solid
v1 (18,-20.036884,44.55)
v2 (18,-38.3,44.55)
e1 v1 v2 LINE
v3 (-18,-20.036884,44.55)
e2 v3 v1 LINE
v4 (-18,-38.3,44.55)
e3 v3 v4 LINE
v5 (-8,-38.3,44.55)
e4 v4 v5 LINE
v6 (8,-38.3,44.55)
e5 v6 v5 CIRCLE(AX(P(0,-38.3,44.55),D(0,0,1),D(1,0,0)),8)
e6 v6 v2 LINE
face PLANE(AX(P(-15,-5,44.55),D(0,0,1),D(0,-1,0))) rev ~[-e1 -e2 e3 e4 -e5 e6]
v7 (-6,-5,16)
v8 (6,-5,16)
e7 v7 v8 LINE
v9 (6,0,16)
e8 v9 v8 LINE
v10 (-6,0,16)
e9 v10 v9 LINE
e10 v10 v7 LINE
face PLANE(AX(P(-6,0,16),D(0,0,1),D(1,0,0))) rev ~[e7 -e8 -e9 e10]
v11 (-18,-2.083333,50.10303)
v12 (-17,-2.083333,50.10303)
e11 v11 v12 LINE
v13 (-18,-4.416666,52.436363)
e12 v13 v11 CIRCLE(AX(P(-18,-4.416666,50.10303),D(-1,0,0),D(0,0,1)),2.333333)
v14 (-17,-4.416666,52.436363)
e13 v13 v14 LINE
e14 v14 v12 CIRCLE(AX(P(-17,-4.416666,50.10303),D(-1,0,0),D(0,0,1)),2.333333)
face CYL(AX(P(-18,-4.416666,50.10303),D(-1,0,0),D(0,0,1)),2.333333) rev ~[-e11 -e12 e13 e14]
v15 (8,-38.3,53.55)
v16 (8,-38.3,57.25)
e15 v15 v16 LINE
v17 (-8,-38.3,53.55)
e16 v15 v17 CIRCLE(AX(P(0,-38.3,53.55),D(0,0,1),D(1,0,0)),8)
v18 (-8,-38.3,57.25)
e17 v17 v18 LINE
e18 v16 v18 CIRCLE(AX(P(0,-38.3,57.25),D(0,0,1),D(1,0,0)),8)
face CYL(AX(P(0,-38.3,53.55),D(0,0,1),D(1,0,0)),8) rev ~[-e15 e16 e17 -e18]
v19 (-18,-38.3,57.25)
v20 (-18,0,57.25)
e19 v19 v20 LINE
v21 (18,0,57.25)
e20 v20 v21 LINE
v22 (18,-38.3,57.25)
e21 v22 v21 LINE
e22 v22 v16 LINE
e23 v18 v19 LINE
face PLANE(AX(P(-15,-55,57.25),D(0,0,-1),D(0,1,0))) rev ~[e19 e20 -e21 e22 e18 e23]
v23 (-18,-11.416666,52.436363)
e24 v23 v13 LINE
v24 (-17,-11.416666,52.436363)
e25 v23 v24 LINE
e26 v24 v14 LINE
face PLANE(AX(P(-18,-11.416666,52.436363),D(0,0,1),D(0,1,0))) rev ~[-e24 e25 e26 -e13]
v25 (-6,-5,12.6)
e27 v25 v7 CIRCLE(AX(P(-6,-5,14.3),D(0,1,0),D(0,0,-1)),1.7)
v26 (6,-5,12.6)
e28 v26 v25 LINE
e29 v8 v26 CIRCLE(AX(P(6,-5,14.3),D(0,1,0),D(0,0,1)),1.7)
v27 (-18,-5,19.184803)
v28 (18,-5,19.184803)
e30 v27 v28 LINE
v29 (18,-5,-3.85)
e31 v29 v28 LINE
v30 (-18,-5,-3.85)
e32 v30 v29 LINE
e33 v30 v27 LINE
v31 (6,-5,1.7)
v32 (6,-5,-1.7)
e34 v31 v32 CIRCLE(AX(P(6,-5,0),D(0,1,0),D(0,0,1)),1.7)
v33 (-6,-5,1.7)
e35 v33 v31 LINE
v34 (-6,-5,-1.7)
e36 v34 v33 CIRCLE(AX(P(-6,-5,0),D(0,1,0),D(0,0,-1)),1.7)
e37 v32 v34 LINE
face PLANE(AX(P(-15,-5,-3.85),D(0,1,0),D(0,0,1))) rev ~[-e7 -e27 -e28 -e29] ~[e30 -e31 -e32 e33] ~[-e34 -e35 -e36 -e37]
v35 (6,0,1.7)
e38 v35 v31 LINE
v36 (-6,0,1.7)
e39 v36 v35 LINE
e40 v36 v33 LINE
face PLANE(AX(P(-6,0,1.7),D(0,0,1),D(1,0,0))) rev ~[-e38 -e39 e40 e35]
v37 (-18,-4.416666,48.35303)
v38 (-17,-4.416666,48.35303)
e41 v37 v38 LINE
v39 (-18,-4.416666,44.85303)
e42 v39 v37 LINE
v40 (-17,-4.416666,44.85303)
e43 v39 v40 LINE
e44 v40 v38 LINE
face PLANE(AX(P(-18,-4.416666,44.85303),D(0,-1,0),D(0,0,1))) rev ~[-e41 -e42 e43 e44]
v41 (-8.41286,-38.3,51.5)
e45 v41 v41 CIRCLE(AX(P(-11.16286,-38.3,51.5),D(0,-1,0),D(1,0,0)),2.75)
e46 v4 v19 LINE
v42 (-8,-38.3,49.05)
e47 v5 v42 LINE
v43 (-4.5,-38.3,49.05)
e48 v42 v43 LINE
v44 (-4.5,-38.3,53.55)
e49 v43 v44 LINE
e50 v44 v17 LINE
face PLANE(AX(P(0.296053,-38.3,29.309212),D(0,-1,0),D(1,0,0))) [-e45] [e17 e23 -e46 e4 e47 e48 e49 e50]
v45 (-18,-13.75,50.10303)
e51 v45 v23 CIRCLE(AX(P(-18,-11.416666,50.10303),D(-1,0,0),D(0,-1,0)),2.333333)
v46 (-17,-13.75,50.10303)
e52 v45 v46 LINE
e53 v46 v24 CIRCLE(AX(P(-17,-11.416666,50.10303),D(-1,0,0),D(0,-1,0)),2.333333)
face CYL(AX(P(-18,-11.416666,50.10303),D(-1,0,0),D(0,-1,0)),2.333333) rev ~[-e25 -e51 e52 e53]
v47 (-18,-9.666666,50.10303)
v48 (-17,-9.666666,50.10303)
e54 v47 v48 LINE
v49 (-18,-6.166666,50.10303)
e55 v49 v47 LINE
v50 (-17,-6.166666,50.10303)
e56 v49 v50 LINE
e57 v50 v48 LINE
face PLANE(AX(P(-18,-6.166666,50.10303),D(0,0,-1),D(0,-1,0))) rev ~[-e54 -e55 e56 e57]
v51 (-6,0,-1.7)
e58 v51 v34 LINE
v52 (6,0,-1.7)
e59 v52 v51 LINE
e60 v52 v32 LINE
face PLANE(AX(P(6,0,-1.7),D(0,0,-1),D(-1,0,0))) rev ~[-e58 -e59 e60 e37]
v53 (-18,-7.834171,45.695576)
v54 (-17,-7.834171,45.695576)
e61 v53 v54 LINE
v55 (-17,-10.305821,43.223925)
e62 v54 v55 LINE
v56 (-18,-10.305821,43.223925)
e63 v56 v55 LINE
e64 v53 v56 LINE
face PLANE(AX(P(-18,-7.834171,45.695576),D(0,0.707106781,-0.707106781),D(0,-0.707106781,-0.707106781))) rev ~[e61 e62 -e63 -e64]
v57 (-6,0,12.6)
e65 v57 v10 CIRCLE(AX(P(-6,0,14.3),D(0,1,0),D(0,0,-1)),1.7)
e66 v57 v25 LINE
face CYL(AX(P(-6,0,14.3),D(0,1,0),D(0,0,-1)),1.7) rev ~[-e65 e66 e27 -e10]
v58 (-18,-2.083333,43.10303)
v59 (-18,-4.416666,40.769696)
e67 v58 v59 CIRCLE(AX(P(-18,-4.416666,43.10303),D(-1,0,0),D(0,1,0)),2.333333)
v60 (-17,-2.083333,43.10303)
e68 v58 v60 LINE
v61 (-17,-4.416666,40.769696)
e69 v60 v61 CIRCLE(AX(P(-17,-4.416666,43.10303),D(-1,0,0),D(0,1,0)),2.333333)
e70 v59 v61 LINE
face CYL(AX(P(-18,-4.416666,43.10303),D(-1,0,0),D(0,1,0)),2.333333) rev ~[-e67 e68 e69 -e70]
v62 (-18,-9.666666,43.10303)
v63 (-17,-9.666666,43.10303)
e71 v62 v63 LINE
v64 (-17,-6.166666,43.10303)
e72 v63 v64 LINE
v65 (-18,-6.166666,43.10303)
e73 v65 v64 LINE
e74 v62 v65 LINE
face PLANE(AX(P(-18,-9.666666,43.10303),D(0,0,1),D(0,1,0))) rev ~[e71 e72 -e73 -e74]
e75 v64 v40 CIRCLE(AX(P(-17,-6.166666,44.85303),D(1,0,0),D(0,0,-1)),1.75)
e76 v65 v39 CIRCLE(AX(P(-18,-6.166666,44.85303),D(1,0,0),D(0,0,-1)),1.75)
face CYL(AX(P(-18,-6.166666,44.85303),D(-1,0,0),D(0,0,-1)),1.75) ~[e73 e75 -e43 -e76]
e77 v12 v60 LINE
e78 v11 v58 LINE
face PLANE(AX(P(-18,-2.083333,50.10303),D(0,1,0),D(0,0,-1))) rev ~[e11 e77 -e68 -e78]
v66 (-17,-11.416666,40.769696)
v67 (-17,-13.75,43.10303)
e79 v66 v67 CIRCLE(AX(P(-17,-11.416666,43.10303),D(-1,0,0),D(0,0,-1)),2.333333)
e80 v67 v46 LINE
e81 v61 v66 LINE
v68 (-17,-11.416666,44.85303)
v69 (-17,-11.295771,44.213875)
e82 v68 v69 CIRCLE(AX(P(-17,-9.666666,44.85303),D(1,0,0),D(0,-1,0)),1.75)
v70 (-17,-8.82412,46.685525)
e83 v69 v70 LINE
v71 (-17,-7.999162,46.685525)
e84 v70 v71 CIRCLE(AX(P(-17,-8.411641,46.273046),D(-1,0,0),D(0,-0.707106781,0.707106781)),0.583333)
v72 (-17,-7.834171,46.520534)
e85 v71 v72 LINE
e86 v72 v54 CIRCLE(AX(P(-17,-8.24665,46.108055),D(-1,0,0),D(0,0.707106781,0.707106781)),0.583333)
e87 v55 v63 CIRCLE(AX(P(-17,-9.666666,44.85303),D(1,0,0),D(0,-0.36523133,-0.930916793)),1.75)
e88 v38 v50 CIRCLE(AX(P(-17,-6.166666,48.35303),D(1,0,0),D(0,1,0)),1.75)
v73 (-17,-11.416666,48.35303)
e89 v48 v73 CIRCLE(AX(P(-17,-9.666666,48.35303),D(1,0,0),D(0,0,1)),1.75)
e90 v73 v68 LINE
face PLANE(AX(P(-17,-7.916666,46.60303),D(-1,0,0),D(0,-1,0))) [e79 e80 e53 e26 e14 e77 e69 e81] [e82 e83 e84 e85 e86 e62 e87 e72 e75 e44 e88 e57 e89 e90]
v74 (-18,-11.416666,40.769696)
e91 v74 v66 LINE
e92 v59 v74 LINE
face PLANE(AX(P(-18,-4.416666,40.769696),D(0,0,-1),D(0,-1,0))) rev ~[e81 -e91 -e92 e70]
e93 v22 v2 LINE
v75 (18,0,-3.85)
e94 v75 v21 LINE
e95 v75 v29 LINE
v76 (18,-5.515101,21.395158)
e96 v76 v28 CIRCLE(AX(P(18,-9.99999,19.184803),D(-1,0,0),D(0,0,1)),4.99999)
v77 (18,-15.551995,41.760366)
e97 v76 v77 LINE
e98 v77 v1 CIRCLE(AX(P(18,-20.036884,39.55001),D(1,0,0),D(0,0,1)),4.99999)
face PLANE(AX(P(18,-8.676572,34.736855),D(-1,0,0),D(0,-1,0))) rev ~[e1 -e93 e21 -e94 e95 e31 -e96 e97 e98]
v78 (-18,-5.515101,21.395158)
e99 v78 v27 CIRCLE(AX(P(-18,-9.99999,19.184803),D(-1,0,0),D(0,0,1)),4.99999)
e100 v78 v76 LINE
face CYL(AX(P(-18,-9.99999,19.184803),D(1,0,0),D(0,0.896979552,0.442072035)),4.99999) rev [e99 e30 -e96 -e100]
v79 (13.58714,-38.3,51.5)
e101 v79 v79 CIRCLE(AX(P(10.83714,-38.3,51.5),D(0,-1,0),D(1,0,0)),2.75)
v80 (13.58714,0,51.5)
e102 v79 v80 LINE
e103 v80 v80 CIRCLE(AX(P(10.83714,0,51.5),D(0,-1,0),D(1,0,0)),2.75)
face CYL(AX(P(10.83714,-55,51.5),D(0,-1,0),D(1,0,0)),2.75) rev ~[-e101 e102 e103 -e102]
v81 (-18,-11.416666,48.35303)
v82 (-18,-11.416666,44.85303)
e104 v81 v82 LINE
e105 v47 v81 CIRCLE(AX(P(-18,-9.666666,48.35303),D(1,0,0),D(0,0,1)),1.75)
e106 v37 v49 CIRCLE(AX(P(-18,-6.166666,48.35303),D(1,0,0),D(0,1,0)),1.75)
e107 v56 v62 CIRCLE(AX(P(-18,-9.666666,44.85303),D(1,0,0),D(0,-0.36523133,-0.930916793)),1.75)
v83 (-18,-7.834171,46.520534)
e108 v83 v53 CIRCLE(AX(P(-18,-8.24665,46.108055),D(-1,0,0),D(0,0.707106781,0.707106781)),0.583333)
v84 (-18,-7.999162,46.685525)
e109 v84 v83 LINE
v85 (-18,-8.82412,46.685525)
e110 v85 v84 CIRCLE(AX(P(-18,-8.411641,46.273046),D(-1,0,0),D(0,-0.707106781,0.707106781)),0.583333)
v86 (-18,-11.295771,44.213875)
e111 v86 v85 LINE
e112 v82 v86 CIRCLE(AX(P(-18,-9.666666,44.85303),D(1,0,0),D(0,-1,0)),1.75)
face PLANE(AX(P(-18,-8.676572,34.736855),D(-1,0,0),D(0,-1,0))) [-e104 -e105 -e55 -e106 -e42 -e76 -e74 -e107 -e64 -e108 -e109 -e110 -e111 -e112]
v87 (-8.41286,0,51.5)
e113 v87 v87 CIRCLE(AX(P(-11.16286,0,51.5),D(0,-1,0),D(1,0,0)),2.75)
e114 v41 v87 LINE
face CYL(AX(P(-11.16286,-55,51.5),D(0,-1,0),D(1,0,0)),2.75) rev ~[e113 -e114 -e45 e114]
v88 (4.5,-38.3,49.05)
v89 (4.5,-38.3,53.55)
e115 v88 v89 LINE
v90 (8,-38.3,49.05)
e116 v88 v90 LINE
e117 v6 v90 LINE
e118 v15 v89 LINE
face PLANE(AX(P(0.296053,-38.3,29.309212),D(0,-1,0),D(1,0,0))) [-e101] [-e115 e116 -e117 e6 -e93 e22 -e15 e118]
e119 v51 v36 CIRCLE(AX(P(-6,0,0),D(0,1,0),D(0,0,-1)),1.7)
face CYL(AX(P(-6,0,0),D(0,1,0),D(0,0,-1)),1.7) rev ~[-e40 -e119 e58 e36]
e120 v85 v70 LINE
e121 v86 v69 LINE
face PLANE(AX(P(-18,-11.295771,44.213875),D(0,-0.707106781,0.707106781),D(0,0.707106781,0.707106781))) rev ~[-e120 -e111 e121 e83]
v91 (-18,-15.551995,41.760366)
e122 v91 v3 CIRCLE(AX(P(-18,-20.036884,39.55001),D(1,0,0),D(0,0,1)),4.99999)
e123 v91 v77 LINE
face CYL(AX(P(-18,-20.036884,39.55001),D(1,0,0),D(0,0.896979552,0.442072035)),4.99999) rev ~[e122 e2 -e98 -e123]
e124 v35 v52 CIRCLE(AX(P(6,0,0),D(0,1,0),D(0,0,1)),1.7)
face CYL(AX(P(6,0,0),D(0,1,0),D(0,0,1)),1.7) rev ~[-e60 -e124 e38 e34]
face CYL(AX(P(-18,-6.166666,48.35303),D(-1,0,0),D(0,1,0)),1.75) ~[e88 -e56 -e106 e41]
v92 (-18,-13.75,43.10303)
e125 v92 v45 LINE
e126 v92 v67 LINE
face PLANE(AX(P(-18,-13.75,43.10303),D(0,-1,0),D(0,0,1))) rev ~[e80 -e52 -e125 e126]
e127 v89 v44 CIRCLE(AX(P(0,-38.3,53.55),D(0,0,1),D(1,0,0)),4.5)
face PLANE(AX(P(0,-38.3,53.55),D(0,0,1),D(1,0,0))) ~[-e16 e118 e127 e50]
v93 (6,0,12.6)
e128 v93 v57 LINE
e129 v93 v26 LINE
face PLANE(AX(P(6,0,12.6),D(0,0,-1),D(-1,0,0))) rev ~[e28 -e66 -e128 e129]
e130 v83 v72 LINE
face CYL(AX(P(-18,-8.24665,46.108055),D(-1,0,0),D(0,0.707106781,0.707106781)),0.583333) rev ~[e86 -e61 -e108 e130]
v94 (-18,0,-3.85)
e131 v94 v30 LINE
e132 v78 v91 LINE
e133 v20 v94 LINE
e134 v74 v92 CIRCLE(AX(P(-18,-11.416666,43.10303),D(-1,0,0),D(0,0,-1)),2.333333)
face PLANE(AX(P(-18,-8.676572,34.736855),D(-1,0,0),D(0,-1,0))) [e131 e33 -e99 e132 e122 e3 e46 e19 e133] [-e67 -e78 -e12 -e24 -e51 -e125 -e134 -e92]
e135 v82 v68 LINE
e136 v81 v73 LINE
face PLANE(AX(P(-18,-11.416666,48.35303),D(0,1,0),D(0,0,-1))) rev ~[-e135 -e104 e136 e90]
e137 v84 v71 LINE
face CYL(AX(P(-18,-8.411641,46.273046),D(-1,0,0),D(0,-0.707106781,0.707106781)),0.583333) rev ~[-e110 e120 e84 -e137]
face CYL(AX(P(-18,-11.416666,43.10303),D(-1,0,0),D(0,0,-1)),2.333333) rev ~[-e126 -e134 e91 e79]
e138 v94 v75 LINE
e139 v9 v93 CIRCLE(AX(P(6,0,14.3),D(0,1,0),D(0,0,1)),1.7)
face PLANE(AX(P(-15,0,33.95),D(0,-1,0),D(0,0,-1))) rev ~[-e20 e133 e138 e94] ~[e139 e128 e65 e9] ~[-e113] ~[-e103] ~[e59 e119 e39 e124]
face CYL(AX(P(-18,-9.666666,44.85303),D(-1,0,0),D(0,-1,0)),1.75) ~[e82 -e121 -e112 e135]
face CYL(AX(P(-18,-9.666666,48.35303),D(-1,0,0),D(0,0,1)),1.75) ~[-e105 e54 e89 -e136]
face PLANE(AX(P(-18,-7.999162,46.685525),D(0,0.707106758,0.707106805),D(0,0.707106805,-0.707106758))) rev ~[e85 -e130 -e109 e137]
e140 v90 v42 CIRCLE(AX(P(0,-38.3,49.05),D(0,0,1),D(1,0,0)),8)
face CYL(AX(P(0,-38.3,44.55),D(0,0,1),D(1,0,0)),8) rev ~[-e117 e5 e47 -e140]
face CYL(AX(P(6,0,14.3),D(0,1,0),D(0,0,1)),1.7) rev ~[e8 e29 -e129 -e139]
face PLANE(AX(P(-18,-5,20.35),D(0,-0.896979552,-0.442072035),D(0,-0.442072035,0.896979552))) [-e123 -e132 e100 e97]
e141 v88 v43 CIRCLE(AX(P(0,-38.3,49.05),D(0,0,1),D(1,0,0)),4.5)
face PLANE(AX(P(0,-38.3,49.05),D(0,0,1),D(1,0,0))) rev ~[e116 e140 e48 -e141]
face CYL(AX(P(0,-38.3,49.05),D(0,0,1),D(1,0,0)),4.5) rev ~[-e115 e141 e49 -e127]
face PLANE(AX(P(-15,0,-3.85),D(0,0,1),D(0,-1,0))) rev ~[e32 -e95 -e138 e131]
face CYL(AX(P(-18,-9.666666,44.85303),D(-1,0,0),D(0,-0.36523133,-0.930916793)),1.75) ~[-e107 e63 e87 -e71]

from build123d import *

# Parameters (mm, degrees)
F0_W      = 30
F0_H      = 22
F1_DEPTH  = 5
F2_DEPTH  = 39.1
F3_W      = 30
F3_H      = 12.7
F4_DEPTH  = 50
F8_W      = 30
F8_H      = 5
F9_DEPTH  = 25
F10_W     = 30
F10_H     = 5
F11_DEPTH = 5
F12_W     = 30
F12_H     = 5
F13_DEPTH = 25
F15_DEPTH = 25
F16_DEPTH = 3
F18_DEPTH = 3
F19_DEPTH = 3
F21_DEPTH = 3
F23_DEPTH = 30
F24_R     = 2.75
F25_DEPTH = 500
F26_W     = 68.0921077728
F26_H     = 72.8289508261
F27_DEPTH = 25
F29_DEPTH = 36
F30_R     = 4.99999
F32_DEPTH = 1
F33_W     = 82.302633673
F33_H     = 75.4934260622
F34_DEPTH = 50


# Not quite as in the source:
# - a fillet or chamfer is up to 0.001 mm smaller than in the source, because OpenCascade refuses the exact size


with BuildPart() as f1:
    # F0 (on Front) → F1 (new body)
    with BuildSketch(Plane.XZ):
        with Locations((0, 7.15)):
            Rectangle(F0_W, F0_H)
        with BuildLine():
            ThreePointArc((-6, -1.7), (-7.7, 0), (-6, 1.7))
            Line((-6, 1.7), (6, 1.7))
            ThreePointArc((6, 1.7), (7.7, 0), (6, -1.7))
            Line((6, -1.7), (-6, -1.7))
        make_face(mode=Mode.SUBTRACT)
        with BuildLine():
            ThreePointArc((-6, 12.6), (-7.7, 14.3), (-6, 16))
            Line((-6, 16), (6, 16))
            ThreePointArc((6, 16), (7.7, 14.3), (6, 12.6))
            Line((6, 12.6), (-6, 12.6))
        make_face(mode=Mode.SUBTRACT)
    extrude(amount=F1_DEPTH)

    # F2 (add): a face of the model
    f2_faces = [f1.faces().sort_by_distance(p)[0] for p in [
        (0, -2.5, 18.15),
    ]]
    extrude(f2_faces, amount=F2_DEPTH)

    # F3 (on face) → F4 (join)
    with BuildSketch(Plane.XZ.offset(5)):
        with Locations((0, 50.9)):
            Rectangle(F3_W, F3_H)
    extrude(amount=F4_DEPTH)

    # F6 (on offset) → F7 (revolve, cut)
    with BuildSketch(Plane.XZ.offset(38.3)):
        Polygon((8, 57.25), (0, 57.25), (0, 44.55), (8, 44.55), (8, 49.05), (4.5, 49.05), (4.5, 53.55), (8, 53.55), align=None)
    revolve(axis=Axis((0, -38.3, 50.9), (0, 0, 1)), mode=Mode.SUBTRACT)

    # F8 (on face) → F9 (join)
    with BuildSketch(Plane(origin=(0, 0, 0), x_dir=(-1, 0, 0), z_dir=(0, 1, 0))):
        with Locations((0, 36.45)):
            Rectangle(F8_W, F8_H)
    extrude(amount=F9_DEPTH)

    # F10 (on face) → F11 (join)
    with BuildSketch(Plane(origin=(0, 0, 33.95), x_dir=(1, 0, 0), z_dir=(0, 0, -1))):
        with Locations((0, -22.5)):
            Rectangle(F10_W, F10_H)
    extrude(amount=F11_DEPTH)

    # F12 (on face) → F13 (join)
    with BuildSketch(Plane(origin=(0, 25, 0), x_dir=(-1, 0, 0), z_dir=(0, 1, 0))):
        with Locations((0, 31.45)):
            Rectangle(F12_W, F12_H)
    extrude(amount=F13_DEPTH)

    # F14 (on face) → F15 (cut)
    with BuildSketch(Plane.XY.offset(33.95)):
        with BuildLine():
            ThreePointArc((7.4548611111, 38.3216117173), (0, 45), (-7.4548611111, 38.3216117173))
            ThreePointArc((-7.4548611111, 38.3216117173), (-10.75, 37.5), (-7.4548611111, 36.6783882827))
            ThreePointArc((-7.4548611111, 36.6783882827), (0, 30), (7.4548611111, 36.6783882827))
            ThreePointArc((7.4548611111, 36.6783882827), (10.75, 37.5), (7.4548611111, 38.3216117173))
        make_face()
    extrude(amount=-F15_DEPTH, mode=Mode.SUBTRACT)

    # F16 (add): a face of the model
    f16_faces = [f1.faces().sort_by_distance(p)[0] for p in [
        (15, -2.5, -2.6351662665),
    ]]
    extrude(f16_faces, amount=F16_DEPTH)

    # F17 (on face) → F18 (join)
    with BuildSketch(Plane.YZ.offset(18)):
        Polygon((50, 33.95), (0, 57.25), (0, 38.95), (25, 38.95), (25, 33.95), align=None)
    extrude(amount=-F18_DEPTH)

    # F19 (add): a face of the model
    f19_faces = [f1.faces().sort_by_distance(p)[0] for p in [
        (-15, -2.5, -2.6351662665),
    ]]
    extrude(f19_faces, amount=F19_DEPTH)

    # F20 (on face) → F21 (join)
    with BuildSketch(Plane(origin=(-18, 0, 0), x_dir=(0, -1, 0), z_dir=(-1, 0, 0))):
        Polygon((0, 57.25), (-50, 33.95), (-25, 33.95), (-25, 38.95), (0, 38.95), align=None)
    extrude(amount=-F21_DEPTH)

    # F22 (on face) → F23 (join, through all)
    with BuildSketch(Plane(origin=(15, 0, 0), x_dir=(0, -1, 0), z_dir=(-1, 0, 0))):
        Polygon((-25, 45.6), (-25, 38.95), (0, 38.95), (0, 57.25), align=None)
    extrude(amount=F23_DEPTH)

    # F24 (on face) → F25 (cut)
    with BuildSketch(Plane.XZ.offset(55)):
        with Locations((-11.1628601777, 51.5)):
            Circle(F24_R)
        with Locations((10.8371398223, 51.5)):
            Circle(F24_R)
    extrude(amount=-F25_DEPTH, mode=Mode.SUBTRACT)

    # F26 (on offset) → F27 (cut)
    with BuildSketch(Plane.XZ.offset(38.3)):
        with Locations((0.2960525453, 29.3092119973)):
            Rectangle(F26_W, F26_H)
    extrude(amount=F27_DEPTH, mode=Mode.SUBTRACT)

    # F28 (on face) → F29 (join)
    with BuildSketch(Plane(origin=(-18, 0, 0), x_dir=(0, -1, 0), z_dir=(-1, 0, 0))):
        Polygon((5, 44.55), (5, 20.35), (16.9268529862, 44.55), align=None)
    extrude(amount=-F29_DEPTH)

    # F30 (radius 5 in the source; OpenCascade refuses exactly that, so slightly less here)
    f30_edges = [f1.edges().sort_by_distance(p)[0] for p in [
        (0, -16.926853, 44.55),
        (0, 20, 33.95),
        (0, -5, 20.35),
    ]]
    fillet(f30_edges, radius=F30_R)

    # F31 (on face) → F32 (cut)
    with BuildSketch(Plane(origin=(-18, 0, 0), x_dir=(0, -1, 0), z_dir=(-1, 0, 0))):
        with BuildLine():
            ThreePointArc((2.083333126, 43.103029569), (2.7667506365, 41.4531137462), (4.4166664593, 40.7696962357))
            Line((4.4166664593, 40.7696962357), (11.4166664593, 40.7696962357))
            ThreePointArc((11.4166664593, 40.7696962357), (13.0665822821, 41.4531137462), (13.7499997926, 43.103029569))
            Line((13.7499997926, 43.103029569), (13.7499997926, 50.103029569))
            ThreePointArc((13.7499997926, 50.103029569), (13.0665822821, 51.7529453918), (11.4166664593, 52.4363629023))
            Line((11.4166664593, 52.4363629023), (4.4166664593, 52.4363629023))
            ThreePointArc((4.4166664593, 52.4363629023), (2.7667506365, 51.7529453918), (2.083333126, 50.103029569))
            Line((2.083333126, 50.103029569), (2.083333126, 43.103029569))
        make_face()
        with BuildLine():
            Line((9.6666664593, 43.103029569), (6.1666664593, 43.103029569))
            ThreePointArc((6.1666664593, 43.103029569), (4.9292295922, 43.6155927019), (4.4166664593, 44.853029569))
            Line((4.4166664593, 44.853029569), (4.4166664593, 48.353029569))
            ThreePointArc((4.4166664593, 48.353029569), (4.9292295922, 49.5904664361), (6.1666664593, 50.103029569))
            Line((6.1666664593, 50.103029569), (9.6666664593, 50.103029569))
            ThreePointArc((9.6666664593, 50.103029569), (10.9041033264, 49.5904664361), (11.4166664593, 48.353029569))
            Line((11.4166664593, 48.353029569), (11.4166664593, 44.853029569))
            ThreePointArc((11.4166664593, 44.853029569), (11.3861769533, 44.5277855668), (11.2957708468, 44.2138747406))
            Line((11.2957708593, 44.2138747357), (8.8241202093, 46.6855253857))
            ThreePointArc((8.8241201983, 46.6855253747), (8.4116412426, 46.8563797523), (7.9991622869, 46.6855253747))
            Line((7.999162276, 46.6855253857), (7.9166664593, 46.603029569))
            Line((7.9166664593, 46.603029569), (7.8341706426, 46.5205337523))
            ThreePointArc((7.8341706536, 46.5205337413), (7.663316276, 46.1080547857), (7.8341706536, 45.69557583))
            Line((7.8341706426, 45.695575819), (10.3058212926, 43.223925169))
            ThreePointArc((10.3058212877, 43.2239251815), (9.9919104615, 43.133519075), (9.6666664593, 43.103029569))
        make_face(mode=Mode.SUBTRACT)
    extrude(amount=-F32_DEPTH, mode=Mode.SUBTRACT)

    # F33 (on face) → F34 (cut)
    with BuildSketch(Plane(origin=(0, 50, 0), x_dir=(-1, 0, 0), z_dir=(0, 1, 0))):
        with Locations((4.7368425876, 23.2401336543)):
            Rectangle(F33_W, F33_H)
        Polygon((-18, 33.95), (-15, 33.95), (15, 33.95), (18, 33.95), (18, 28.95), (-18, 28.95), align=None, mode=Mode.SUBTRACT)
        Polygon((15, 33.95), (-15, 33.95), (-18, 33.95), (-18, 28.95), (18, 28.95), (18, 33.95), align=None)
    extrude(amount=-F34_DEPTH, mode=Mode.SUBTRACT)


solid = f1.part
